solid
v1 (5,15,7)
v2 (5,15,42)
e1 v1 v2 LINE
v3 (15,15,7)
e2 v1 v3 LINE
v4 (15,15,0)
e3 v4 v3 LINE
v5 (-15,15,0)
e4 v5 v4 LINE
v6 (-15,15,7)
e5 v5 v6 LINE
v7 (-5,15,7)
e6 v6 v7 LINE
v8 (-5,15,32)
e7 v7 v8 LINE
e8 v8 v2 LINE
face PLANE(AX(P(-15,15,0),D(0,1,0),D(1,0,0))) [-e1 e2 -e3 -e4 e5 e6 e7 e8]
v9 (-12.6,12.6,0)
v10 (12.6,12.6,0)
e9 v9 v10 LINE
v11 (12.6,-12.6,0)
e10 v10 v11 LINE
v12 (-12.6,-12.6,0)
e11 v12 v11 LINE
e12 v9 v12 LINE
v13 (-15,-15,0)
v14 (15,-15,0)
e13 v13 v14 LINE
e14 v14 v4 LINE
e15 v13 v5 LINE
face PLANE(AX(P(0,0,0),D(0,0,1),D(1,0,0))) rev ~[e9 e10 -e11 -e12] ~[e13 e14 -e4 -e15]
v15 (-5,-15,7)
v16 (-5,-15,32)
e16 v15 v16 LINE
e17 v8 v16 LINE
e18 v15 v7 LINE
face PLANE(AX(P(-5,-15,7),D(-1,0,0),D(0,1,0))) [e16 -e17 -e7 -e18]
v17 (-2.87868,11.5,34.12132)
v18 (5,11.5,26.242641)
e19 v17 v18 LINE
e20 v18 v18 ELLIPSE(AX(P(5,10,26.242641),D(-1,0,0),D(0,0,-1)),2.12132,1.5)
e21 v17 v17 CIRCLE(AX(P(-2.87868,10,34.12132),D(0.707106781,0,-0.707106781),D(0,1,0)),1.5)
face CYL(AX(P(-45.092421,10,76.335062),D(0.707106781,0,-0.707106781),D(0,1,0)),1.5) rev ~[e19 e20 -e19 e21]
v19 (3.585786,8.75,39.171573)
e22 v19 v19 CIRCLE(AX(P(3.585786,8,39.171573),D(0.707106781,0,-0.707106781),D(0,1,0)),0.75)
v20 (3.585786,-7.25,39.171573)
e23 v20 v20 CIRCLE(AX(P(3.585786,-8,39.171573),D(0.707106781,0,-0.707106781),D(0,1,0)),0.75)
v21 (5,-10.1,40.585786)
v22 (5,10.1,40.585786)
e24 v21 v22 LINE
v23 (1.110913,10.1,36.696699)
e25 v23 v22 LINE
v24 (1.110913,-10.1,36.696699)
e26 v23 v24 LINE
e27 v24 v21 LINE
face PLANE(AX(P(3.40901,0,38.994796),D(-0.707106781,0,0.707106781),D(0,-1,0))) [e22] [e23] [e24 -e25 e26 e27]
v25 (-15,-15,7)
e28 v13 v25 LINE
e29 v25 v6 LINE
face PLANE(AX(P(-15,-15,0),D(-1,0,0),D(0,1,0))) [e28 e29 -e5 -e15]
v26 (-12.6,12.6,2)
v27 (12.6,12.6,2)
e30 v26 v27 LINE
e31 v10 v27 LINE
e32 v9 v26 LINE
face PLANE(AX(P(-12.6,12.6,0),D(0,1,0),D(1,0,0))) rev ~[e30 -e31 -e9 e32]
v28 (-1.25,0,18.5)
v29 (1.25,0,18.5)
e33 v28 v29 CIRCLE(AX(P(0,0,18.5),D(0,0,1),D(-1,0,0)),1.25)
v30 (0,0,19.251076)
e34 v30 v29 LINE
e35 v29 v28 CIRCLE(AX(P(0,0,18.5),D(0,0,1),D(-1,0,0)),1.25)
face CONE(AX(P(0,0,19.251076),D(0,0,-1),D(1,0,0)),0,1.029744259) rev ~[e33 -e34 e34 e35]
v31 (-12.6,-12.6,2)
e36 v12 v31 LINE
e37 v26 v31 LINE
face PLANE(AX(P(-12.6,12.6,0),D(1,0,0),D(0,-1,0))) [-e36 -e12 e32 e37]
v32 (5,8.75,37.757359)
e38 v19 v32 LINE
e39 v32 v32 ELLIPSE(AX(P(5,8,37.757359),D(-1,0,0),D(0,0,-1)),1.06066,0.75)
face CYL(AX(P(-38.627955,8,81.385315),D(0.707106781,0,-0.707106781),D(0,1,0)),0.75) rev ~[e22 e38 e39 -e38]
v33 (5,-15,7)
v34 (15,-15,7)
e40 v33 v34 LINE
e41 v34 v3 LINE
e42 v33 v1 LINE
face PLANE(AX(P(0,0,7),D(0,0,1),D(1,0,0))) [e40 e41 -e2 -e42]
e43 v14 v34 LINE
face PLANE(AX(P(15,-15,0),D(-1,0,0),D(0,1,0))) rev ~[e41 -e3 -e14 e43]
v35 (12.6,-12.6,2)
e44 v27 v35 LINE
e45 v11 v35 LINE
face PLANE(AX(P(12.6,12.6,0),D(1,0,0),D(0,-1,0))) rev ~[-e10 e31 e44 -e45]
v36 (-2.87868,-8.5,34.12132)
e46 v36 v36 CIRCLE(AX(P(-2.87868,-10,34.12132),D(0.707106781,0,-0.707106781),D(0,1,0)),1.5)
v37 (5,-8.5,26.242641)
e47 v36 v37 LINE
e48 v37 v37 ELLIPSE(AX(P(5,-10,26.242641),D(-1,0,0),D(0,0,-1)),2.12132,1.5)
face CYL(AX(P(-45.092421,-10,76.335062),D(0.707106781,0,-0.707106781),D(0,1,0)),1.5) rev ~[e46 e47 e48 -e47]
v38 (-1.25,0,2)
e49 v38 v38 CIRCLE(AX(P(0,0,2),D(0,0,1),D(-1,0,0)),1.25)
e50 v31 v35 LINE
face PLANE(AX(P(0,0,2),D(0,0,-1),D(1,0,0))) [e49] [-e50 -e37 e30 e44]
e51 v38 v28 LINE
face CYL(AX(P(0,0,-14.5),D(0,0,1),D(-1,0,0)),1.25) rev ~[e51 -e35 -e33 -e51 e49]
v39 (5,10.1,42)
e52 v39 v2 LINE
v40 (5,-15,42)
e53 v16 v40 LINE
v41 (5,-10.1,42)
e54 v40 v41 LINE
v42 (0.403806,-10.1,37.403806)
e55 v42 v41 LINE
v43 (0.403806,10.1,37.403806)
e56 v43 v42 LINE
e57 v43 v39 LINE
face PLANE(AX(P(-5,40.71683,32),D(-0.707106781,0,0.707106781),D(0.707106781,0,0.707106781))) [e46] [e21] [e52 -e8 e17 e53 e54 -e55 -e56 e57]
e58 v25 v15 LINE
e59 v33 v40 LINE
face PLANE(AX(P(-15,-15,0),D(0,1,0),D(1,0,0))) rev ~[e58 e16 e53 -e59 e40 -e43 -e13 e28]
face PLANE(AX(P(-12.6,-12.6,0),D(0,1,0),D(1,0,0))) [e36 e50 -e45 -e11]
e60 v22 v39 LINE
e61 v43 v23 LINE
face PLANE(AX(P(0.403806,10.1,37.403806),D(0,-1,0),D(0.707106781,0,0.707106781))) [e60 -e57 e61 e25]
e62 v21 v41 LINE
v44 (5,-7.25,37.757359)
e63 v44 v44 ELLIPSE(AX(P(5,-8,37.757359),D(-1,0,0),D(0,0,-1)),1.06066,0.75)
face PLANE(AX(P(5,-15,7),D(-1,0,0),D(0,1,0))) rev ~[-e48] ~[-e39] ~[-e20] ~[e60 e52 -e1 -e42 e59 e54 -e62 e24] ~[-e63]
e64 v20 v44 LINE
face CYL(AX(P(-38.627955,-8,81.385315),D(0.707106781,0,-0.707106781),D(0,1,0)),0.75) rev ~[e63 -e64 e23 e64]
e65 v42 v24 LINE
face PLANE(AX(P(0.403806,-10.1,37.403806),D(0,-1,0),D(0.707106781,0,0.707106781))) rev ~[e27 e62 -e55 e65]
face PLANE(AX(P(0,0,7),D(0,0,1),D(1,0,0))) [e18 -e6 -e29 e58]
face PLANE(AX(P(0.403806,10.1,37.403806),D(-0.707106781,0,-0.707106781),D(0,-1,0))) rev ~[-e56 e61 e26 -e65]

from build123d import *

# Parameters (mm, degrees)
F0_W        = 30
F0_H        = 30
F1_DEPTH    = 7
F2_W        = 10
F2_H        = 30
F3_DEPTH    = 35
F4_T1_DEPTH = 81.4336597593
F5_W        = 25.2
F5_H        = 25.2
F6_DEPTH    = 2
F9_D        = 2.5
F9_DEPTH    = 16.5
F9_TIP      = 0.7510757738
F10_W       = 20.2
F10_H       = 6.5
F11_DEPTH   = 1
F14_D       = 1.5
F16_D       = 3


# Not quite as in the source:
# - a fillet or chamfer that OpenCascade refuses, or shapes differently, is made with other operations: its cross-section is extruded or revolved along the edge and cut away or added


with BuildPart() as f1:
    # F0 (on Top) → F1 (new body)
    with BuildSketch(Plane.XY):
        Rectangle(F0_W, F0_H)
    extrude(amount=F1_DEPTH)

    # F2 (on face) → F3 (join)
    with BuildSketch(Plane.XY.offset(7)):
        Rectangle(F2_W, F2_H)
    extrude(amount=F3_DEPTH)

    # F4: chamfer of 10 on 1 edges, made by hand

    # F4_s2 → F4_t1 (cut)
    with BuildSketch(Plane.XZ.offset(-40.7168298797)):
        Polygon((-5, 32), (5, 42), (-5, 42), align=None)
    extrude(amount=F4_T1_DEPTH, mode=Mode.SUBTRACT)


with BuildPart() as f6:
    # F5 (on face) → F6 (new body)
    with BuildSketch(Plane(origin=(0, 0, 0), x_dir=(1, 0, 0), z_dir=(0, 0, -1))):
        Rectangle(F5_W, F5_H)
    extrude(amount=-F6_DEPTH)


with BuildPart() as f1_1:
    add(f1.part)

    # F7: cut F6
    add(f6.part, mode=Mode.SUBTRACT)

    # F9
    with Locations(Plane(origin=(0, 0, 2), x_dir=(1, 0, 0), z_dir=(0, 0, -1))):
        with Locations((0, 0)):
            Hole(F9_D / 2, depth=F9_DEPTH)
            with Locations((0, 0, -(F9_DEPTH + F9_TIP / 2))):  # 118° drill point
                Cone(0, F9_D / 2, F9_TIP, mode=Mode.SUBTRACT)


with BuildPart() as f11:
    # F10 (on face) → F11 (new body)
    with BuildSketch(Plane(origin=(-18.5, 0, 18.5), x_dir=(0, -1, 0), z_dir=(-0.7071067812, 0, 0.7071067812))):
        with Locations((0, 29.9840187158)):
            Rectangle(F10_W, F10_H)
    extrude(amount=-F11_DEPTH)


with BuildPart() as f1_2:
    add(f1_1.part)

    # F12: cut F11
    add(f11.part, mode=Mode.SUBTRACT)

    # F14 (through all)
    with Locations(Plane(origin=(-17.7928932188, 0, 17.7928932188), x_dir=(0, -1, 0), z_dir=(-0.7071067812, 0, 0.7071067812))):
        with Locations((-8, 30.2340187158), (8, 30.2340187158)):
            Hole(F14_D / 2)

    # F16 (through all)
    with Locations(Plane(origin=(-18.5, 0, 18.5), x_dir=(0, -1, 0), z_dir=(-0.7071067812, 0, 0.7071067812))):
        with Locations((-10, 22.091883092), (10, 22.091883092)):
            Hole(F16_D / 2)


solid = f1_2.part
